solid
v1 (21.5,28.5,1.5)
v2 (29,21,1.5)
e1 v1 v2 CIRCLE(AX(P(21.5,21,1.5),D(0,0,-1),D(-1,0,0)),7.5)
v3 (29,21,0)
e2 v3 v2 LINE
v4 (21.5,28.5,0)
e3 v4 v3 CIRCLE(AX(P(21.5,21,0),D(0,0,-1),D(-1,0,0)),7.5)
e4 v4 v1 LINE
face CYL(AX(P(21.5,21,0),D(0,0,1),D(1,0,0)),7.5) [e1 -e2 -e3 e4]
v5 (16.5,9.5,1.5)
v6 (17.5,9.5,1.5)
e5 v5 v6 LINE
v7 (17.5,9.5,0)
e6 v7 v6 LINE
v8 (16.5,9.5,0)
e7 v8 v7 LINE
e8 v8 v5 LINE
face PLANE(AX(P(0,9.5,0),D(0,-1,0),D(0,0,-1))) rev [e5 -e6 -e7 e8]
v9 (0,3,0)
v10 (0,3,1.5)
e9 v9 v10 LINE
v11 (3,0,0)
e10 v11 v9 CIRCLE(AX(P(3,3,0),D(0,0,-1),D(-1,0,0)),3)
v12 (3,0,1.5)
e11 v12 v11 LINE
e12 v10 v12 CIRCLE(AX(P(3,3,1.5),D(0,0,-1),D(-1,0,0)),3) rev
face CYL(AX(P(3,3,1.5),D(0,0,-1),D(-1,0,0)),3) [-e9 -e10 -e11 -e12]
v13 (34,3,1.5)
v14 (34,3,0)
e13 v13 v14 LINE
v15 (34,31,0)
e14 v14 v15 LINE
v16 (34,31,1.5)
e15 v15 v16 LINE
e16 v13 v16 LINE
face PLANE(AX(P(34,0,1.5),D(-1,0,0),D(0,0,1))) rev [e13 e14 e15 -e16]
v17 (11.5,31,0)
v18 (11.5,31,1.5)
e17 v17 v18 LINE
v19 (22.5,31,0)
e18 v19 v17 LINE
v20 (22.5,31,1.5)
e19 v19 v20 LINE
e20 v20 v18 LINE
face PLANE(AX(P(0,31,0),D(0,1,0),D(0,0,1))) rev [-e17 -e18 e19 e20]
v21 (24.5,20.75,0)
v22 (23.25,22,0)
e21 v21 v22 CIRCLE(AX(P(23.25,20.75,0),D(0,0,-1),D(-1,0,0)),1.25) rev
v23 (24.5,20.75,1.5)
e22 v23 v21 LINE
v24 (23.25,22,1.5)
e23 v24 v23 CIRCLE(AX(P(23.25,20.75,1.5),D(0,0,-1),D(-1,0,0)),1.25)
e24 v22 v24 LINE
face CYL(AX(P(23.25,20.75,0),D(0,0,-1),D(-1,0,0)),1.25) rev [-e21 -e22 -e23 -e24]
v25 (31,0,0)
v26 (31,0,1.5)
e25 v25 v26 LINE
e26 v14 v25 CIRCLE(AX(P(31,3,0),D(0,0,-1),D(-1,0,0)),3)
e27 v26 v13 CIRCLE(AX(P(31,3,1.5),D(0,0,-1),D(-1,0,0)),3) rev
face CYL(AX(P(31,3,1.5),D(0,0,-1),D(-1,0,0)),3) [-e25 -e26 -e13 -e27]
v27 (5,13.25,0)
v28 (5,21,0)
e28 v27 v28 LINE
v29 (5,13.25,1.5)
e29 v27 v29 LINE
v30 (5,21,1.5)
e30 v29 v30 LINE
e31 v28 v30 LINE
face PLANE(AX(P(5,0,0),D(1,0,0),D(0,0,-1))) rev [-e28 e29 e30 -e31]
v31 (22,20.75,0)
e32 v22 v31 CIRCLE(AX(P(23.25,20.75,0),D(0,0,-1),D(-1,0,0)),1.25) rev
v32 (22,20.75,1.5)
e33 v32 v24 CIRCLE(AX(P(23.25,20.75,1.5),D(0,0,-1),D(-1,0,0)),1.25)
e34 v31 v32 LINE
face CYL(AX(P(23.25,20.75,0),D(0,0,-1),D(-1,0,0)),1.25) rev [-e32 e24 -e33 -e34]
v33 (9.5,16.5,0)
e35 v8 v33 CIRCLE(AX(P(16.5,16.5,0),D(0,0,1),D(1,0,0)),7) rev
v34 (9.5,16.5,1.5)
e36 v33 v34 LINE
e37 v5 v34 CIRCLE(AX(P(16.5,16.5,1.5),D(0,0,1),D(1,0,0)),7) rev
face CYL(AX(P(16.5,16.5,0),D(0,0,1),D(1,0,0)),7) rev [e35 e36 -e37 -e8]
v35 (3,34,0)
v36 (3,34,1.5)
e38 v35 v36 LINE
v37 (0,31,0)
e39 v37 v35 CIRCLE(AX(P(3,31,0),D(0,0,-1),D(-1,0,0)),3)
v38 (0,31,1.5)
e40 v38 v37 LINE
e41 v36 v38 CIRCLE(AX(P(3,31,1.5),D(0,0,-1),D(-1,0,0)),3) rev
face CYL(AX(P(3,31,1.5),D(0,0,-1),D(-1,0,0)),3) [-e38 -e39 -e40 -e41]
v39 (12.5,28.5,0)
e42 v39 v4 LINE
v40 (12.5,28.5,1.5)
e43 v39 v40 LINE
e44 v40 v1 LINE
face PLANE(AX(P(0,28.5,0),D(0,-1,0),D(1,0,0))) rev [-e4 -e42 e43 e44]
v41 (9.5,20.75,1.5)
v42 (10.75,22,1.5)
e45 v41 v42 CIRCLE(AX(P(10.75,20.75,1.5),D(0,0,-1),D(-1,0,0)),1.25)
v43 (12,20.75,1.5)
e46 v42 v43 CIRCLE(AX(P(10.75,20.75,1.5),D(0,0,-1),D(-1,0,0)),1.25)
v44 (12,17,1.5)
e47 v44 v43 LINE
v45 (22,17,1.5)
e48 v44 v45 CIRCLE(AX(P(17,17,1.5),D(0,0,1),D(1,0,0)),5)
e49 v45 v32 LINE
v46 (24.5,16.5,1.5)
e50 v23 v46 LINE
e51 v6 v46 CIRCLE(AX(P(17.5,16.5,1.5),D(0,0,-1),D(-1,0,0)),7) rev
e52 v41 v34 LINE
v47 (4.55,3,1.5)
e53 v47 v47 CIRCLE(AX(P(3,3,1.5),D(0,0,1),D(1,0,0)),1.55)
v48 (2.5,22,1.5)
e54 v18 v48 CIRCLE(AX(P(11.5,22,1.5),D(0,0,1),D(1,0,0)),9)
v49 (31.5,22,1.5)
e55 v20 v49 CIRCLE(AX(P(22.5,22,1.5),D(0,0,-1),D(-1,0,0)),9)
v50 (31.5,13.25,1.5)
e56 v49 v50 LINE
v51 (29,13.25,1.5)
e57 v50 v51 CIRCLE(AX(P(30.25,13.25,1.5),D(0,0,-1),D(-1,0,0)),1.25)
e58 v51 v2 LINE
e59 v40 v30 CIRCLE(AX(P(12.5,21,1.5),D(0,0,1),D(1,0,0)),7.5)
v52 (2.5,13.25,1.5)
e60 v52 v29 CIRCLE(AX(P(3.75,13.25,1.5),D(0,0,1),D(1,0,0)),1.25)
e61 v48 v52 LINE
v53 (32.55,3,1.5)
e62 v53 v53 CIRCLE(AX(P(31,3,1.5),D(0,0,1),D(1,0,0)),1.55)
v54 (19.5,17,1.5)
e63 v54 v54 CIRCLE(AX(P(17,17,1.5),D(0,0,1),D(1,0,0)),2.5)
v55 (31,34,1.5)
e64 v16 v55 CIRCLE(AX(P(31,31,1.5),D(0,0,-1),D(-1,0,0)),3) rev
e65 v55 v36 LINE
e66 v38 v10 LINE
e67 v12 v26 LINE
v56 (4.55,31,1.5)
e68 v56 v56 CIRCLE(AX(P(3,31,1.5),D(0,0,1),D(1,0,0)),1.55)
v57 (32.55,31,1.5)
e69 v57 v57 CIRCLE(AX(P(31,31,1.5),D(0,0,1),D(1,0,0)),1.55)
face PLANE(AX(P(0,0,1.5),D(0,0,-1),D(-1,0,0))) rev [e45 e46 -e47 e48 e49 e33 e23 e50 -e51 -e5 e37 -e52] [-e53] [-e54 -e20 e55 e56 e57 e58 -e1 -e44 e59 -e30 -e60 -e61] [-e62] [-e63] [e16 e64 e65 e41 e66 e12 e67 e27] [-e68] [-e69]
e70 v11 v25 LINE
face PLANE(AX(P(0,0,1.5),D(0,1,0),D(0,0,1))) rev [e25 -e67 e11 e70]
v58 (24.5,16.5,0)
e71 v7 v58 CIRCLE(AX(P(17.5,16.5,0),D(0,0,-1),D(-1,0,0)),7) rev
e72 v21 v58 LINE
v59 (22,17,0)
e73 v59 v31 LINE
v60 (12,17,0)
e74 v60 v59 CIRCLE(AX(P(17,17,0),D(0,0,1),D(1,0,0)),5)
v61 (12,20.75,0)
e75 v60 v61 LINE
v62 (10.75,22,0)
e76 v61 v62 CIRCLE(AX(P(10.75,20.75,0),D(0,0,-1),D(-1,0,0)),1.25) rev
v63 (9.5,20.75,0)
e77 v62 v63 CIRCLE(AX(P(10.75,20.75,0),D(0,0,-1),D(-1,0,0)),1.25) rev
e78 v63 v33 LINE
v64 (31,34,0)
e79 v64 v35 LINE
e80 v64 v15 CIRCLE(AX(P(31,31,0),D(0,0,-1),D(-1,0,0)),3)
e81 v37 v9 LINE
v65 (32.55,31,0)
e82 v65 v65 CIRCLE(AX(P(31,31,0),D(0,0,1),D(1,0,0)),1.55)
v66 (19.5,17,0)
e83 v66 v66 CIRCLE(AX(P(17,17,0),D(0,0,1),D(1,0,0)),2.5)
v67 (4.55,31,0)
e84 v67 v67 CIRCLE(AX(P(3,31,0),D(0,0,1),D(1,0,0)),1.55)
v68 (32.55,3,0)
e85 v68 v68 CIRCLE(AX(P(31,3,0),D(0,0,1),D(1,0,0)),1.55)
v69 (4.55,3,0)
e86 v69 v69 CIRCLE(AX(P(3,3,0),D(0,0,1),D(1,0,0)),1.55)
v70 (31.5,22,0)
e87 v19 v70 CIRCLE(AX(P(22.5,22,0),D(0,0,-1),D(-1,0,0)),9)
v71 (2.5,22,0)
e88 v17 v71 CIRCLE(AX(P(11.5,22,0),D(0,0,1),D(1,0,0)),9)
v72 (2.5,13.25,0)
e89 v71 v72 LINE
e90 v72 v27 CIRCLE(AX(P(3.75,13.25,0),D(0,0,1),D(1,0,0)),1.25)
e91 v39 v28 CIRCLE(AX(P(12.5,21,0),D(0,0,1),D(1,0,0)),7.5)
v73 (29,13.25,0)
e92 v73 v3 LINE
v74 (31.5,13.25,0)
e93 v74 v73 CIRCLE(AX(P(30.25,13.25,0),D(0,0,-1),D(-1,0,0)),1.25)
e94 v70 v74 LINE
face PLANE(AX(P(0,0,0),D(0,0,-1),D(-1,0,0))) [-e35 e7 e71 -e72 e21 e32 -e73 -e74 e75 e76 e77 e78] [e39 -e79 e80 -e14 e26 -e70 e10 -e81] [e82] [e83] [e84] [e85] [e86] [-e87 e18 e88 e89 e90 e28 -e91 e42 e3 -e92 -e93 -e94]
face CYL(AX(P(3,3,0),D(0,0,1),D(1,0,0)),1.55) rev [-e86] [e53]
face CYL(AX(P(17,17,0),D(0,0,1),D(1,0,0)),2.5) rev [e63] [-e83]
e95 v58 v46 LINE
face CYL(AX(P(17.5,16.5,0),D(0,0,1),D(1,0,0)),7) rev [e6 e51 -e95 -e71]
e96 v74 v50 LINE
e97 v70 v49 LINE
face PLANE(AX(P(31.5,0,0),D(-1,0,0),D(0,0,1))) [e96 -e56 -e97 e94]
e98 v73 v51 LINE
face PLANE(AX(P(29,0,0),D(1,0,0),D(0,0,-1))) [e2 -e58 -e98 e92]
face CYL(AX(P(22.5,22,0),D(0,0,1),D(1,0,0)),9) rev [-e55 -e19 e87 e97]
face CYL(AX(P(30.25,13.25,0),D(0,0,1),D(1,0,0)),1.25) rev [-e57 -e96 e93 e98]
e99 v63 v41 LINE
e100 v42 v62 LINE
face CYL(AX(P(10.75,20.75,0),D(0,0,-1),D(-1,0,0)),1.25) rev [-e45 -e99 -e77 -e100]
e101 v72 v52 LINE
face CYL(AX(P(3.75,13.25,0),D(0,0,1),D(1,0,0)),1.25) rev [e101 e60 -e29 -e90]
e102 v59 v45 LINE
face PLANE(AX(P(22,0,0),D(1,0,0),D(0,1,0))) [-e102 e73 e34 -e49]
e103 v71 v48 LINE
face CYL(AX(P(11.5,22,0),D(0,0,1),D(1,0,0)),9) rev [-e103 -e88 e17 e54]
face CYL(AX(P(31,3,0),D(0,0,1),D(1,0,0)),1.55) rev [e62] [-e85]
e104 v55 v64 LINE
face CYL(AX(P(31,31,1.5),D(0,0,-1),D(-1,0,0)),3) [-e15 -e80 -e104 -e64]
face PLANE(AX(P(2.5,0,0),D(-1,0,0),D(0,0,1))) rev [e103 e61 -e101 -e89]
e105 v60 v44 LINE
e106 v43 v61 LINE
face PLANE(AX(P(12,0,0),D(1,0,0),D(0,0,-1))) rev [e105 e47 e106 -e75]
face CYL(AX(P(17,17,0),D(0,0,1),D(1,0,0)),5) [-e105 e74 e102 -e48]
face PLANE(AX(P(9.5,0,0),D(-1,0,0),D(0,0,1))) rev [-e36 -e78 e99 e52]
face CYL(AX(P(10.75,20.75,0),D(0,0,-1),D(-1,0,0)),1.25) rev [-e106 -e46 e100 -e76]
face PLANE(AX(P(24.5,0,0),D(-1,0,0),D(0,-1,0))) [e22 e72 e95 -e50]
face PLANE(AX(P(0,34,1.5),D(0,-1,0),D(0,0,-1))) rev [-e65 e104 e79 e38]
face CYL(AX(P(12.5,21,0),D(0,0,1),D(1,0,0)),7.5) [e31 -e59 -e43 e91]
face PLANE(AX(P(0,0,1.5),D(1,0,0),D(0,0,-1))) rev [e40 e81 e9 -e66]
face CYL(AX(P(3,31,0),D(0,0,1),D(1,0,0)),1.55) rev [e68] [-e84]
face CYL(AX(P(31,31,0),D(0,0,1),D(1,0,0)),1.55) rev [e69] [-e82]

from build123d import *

# Parameters (mm, degrees)
SKETCH_1_W             = 34
SKETCH_1_H             = 34
EXTRUDE_1_DEPTH        = 1.5
SKETCH_2_R             = 2.5
SKETCH_2_R_2           = 1.55
CUT_EXTRUDE_1_DEPTH    = 49.106652347
SKETCH_3_R             = 1.25
CUT_EXTRUDE_2_DEPTH    = 49.106652347
CUT_EXTRUDE_3_DEPTH    = 49.106652347
FILLET_1_R             = 1.25
FILLET_1_OF_MIRROR_3_R = 1.25
FILLET_2_R             = 3


with BuildPart() as part:
    # ｽｹｯﾁ1 → ﾎﾞｽ - 押し出し1 (new body)
    with BuildSketch(Plane.XY):
        with Locations((17, 17)):
            Rectangle(SKETCH_1_W, SKETCH_1_H)
    extrude(amount=EXTRUDE_1_DEPTH)

    # ｽｹｯﾁ2 → ｶｯﾄ - 押し出し1 (cut, through all)
    with BuildSketch(Plane.XY.offset(1.5)):
        with Locations((17, 17)):
            Circle(SKETCH_2_R)
        with Locations((3, 31)):
            Circle(SKETCH_2_R_2)
        with Locations((31, 31)):
            Circle(SKETCH_2_R_2)
        with Locations((3, 3)):
            Circle(SKETCH_2_R_2)
        with Locations((31, 3)):
            Circle(SKETCH_2_R_2)
    extrude(amount=-CUT_EXTRUDE_1_DEPTH, mode=Mode.SUBTRACT)

    # ｽｹｯﾁ3 → ｶｯﾄ - 押し出し2 (cut, through all)
    with BuildSketch(Plane.XY.offset(1.5)):
        with BuildLine():
            Line((2.5, 22), (2.5, 13.25))
            ThreePointArc((2.5, 13.25), (3.75, 14.5), (5, 13.25))
            Line((5, 13.25), (5, 21))
            ThreePointArc((5, 21), (7.196699141, 26.303300859), (12.5, 28.5))
            Line((12.5, 28.5), (17, 28.5))
            Line((17, 28.5), (17, 31))
            Line((17, 31), (11.5, 31))
            ThreePointArc((11.5, 31), (5.136038969, 28.363961031), (2.5, 22))
        make_face()
        with Locations((3.75, 13.25)):
            Circle(SKETCH_3_R)
    cut_extrude_2 = extrude(amount=-CUT_EXTRUDE_2_DEPTH, mode=Mode.SUBTRACT)

    # ﾐﾗｰ1: ｶｯﾄ - 押し出し2 across plane
    add(cut_extrude_2.mirror(Plane(origin=(17, 0, 0), x_dir=(0, 0, 1), z_dir=(1, 0, 0))), mode=Mode.SUBTRACT)

    # ｽｹｯﾁ4 → ｶｯﾄ - 押し出し3 (cut, through all)
    with BuildSketch(Plane.XY.offset(1.5)):
        with BuildLine():
            ThreePointArc((17, 12), (13.464466094, 13.464466094), (12, 17))
            Line((12, 17), (12, 22))
            Line((12, 22), (9.5, 22))
            Line((9.5, 22), (9.5, 16.5))
            ThreePointArc((9.5, 16.5), (11.550252532, 11.550252532), (16.5, 9.5))
            Line((16.5, 9.5), (17, 9.5))
            Line((17, 9.5), (17, 12))
        make_face()
    cut_extrude_3 = extrude(amount=-CUT_EXTRUDE_3_DEPTH, mode=Mode.SUBTRACT)

    # ﾌｨﾚｯﾄ1
    fillet_1_edges = [part.edges().sort_by_distance(p)[0] for p in [
        (12, 22, 0.75),
        (9.5, 22, 0.75),
    ]]
    fillet(fillet_1_edges, radius=FILLET_1_R - 0.0001)  # a hair under: the kernel refuses the full size

    # ﾐﾗｰ3: ｶｯﾄ - 押し出し3 across plane
    add(cut_extrude_3.mirror(Plane(origin=(17, 0, 0), x_dir=(0, 0, 1), z_dir=(1, 0, 0))), mode=Mode.SUBTRACT)

    # ﾌｨﾚｯﾄ1 of ﾐﾗｰ3
    fillet_1_of_mirror_3_edges = [part.edges().sort_by_distance(p)[0] for p in [
        (22, 22, 0.75),
        (24.5, 22, 0.75),
    ]]
    fillet(fillet_1_of_mirror_3_edges, radius=FILLET_1_OF_MIRROR_3_R - 0.0001)  # a hair under: the kernel refuses the full size

    # ﾌｨﾚｯﾄ2
    fillet_2_edges = [part.edges().sort_by_distance(p)[0] for p in [
        (0, 34, 0.75),
        (34, 34, 0.75),
        (34, 0, 0.75),
        (0, 0, 0.75),
    ]]
    fillet(fillet_2_edges, radius=FILLET_2_R)


solid = part.part
